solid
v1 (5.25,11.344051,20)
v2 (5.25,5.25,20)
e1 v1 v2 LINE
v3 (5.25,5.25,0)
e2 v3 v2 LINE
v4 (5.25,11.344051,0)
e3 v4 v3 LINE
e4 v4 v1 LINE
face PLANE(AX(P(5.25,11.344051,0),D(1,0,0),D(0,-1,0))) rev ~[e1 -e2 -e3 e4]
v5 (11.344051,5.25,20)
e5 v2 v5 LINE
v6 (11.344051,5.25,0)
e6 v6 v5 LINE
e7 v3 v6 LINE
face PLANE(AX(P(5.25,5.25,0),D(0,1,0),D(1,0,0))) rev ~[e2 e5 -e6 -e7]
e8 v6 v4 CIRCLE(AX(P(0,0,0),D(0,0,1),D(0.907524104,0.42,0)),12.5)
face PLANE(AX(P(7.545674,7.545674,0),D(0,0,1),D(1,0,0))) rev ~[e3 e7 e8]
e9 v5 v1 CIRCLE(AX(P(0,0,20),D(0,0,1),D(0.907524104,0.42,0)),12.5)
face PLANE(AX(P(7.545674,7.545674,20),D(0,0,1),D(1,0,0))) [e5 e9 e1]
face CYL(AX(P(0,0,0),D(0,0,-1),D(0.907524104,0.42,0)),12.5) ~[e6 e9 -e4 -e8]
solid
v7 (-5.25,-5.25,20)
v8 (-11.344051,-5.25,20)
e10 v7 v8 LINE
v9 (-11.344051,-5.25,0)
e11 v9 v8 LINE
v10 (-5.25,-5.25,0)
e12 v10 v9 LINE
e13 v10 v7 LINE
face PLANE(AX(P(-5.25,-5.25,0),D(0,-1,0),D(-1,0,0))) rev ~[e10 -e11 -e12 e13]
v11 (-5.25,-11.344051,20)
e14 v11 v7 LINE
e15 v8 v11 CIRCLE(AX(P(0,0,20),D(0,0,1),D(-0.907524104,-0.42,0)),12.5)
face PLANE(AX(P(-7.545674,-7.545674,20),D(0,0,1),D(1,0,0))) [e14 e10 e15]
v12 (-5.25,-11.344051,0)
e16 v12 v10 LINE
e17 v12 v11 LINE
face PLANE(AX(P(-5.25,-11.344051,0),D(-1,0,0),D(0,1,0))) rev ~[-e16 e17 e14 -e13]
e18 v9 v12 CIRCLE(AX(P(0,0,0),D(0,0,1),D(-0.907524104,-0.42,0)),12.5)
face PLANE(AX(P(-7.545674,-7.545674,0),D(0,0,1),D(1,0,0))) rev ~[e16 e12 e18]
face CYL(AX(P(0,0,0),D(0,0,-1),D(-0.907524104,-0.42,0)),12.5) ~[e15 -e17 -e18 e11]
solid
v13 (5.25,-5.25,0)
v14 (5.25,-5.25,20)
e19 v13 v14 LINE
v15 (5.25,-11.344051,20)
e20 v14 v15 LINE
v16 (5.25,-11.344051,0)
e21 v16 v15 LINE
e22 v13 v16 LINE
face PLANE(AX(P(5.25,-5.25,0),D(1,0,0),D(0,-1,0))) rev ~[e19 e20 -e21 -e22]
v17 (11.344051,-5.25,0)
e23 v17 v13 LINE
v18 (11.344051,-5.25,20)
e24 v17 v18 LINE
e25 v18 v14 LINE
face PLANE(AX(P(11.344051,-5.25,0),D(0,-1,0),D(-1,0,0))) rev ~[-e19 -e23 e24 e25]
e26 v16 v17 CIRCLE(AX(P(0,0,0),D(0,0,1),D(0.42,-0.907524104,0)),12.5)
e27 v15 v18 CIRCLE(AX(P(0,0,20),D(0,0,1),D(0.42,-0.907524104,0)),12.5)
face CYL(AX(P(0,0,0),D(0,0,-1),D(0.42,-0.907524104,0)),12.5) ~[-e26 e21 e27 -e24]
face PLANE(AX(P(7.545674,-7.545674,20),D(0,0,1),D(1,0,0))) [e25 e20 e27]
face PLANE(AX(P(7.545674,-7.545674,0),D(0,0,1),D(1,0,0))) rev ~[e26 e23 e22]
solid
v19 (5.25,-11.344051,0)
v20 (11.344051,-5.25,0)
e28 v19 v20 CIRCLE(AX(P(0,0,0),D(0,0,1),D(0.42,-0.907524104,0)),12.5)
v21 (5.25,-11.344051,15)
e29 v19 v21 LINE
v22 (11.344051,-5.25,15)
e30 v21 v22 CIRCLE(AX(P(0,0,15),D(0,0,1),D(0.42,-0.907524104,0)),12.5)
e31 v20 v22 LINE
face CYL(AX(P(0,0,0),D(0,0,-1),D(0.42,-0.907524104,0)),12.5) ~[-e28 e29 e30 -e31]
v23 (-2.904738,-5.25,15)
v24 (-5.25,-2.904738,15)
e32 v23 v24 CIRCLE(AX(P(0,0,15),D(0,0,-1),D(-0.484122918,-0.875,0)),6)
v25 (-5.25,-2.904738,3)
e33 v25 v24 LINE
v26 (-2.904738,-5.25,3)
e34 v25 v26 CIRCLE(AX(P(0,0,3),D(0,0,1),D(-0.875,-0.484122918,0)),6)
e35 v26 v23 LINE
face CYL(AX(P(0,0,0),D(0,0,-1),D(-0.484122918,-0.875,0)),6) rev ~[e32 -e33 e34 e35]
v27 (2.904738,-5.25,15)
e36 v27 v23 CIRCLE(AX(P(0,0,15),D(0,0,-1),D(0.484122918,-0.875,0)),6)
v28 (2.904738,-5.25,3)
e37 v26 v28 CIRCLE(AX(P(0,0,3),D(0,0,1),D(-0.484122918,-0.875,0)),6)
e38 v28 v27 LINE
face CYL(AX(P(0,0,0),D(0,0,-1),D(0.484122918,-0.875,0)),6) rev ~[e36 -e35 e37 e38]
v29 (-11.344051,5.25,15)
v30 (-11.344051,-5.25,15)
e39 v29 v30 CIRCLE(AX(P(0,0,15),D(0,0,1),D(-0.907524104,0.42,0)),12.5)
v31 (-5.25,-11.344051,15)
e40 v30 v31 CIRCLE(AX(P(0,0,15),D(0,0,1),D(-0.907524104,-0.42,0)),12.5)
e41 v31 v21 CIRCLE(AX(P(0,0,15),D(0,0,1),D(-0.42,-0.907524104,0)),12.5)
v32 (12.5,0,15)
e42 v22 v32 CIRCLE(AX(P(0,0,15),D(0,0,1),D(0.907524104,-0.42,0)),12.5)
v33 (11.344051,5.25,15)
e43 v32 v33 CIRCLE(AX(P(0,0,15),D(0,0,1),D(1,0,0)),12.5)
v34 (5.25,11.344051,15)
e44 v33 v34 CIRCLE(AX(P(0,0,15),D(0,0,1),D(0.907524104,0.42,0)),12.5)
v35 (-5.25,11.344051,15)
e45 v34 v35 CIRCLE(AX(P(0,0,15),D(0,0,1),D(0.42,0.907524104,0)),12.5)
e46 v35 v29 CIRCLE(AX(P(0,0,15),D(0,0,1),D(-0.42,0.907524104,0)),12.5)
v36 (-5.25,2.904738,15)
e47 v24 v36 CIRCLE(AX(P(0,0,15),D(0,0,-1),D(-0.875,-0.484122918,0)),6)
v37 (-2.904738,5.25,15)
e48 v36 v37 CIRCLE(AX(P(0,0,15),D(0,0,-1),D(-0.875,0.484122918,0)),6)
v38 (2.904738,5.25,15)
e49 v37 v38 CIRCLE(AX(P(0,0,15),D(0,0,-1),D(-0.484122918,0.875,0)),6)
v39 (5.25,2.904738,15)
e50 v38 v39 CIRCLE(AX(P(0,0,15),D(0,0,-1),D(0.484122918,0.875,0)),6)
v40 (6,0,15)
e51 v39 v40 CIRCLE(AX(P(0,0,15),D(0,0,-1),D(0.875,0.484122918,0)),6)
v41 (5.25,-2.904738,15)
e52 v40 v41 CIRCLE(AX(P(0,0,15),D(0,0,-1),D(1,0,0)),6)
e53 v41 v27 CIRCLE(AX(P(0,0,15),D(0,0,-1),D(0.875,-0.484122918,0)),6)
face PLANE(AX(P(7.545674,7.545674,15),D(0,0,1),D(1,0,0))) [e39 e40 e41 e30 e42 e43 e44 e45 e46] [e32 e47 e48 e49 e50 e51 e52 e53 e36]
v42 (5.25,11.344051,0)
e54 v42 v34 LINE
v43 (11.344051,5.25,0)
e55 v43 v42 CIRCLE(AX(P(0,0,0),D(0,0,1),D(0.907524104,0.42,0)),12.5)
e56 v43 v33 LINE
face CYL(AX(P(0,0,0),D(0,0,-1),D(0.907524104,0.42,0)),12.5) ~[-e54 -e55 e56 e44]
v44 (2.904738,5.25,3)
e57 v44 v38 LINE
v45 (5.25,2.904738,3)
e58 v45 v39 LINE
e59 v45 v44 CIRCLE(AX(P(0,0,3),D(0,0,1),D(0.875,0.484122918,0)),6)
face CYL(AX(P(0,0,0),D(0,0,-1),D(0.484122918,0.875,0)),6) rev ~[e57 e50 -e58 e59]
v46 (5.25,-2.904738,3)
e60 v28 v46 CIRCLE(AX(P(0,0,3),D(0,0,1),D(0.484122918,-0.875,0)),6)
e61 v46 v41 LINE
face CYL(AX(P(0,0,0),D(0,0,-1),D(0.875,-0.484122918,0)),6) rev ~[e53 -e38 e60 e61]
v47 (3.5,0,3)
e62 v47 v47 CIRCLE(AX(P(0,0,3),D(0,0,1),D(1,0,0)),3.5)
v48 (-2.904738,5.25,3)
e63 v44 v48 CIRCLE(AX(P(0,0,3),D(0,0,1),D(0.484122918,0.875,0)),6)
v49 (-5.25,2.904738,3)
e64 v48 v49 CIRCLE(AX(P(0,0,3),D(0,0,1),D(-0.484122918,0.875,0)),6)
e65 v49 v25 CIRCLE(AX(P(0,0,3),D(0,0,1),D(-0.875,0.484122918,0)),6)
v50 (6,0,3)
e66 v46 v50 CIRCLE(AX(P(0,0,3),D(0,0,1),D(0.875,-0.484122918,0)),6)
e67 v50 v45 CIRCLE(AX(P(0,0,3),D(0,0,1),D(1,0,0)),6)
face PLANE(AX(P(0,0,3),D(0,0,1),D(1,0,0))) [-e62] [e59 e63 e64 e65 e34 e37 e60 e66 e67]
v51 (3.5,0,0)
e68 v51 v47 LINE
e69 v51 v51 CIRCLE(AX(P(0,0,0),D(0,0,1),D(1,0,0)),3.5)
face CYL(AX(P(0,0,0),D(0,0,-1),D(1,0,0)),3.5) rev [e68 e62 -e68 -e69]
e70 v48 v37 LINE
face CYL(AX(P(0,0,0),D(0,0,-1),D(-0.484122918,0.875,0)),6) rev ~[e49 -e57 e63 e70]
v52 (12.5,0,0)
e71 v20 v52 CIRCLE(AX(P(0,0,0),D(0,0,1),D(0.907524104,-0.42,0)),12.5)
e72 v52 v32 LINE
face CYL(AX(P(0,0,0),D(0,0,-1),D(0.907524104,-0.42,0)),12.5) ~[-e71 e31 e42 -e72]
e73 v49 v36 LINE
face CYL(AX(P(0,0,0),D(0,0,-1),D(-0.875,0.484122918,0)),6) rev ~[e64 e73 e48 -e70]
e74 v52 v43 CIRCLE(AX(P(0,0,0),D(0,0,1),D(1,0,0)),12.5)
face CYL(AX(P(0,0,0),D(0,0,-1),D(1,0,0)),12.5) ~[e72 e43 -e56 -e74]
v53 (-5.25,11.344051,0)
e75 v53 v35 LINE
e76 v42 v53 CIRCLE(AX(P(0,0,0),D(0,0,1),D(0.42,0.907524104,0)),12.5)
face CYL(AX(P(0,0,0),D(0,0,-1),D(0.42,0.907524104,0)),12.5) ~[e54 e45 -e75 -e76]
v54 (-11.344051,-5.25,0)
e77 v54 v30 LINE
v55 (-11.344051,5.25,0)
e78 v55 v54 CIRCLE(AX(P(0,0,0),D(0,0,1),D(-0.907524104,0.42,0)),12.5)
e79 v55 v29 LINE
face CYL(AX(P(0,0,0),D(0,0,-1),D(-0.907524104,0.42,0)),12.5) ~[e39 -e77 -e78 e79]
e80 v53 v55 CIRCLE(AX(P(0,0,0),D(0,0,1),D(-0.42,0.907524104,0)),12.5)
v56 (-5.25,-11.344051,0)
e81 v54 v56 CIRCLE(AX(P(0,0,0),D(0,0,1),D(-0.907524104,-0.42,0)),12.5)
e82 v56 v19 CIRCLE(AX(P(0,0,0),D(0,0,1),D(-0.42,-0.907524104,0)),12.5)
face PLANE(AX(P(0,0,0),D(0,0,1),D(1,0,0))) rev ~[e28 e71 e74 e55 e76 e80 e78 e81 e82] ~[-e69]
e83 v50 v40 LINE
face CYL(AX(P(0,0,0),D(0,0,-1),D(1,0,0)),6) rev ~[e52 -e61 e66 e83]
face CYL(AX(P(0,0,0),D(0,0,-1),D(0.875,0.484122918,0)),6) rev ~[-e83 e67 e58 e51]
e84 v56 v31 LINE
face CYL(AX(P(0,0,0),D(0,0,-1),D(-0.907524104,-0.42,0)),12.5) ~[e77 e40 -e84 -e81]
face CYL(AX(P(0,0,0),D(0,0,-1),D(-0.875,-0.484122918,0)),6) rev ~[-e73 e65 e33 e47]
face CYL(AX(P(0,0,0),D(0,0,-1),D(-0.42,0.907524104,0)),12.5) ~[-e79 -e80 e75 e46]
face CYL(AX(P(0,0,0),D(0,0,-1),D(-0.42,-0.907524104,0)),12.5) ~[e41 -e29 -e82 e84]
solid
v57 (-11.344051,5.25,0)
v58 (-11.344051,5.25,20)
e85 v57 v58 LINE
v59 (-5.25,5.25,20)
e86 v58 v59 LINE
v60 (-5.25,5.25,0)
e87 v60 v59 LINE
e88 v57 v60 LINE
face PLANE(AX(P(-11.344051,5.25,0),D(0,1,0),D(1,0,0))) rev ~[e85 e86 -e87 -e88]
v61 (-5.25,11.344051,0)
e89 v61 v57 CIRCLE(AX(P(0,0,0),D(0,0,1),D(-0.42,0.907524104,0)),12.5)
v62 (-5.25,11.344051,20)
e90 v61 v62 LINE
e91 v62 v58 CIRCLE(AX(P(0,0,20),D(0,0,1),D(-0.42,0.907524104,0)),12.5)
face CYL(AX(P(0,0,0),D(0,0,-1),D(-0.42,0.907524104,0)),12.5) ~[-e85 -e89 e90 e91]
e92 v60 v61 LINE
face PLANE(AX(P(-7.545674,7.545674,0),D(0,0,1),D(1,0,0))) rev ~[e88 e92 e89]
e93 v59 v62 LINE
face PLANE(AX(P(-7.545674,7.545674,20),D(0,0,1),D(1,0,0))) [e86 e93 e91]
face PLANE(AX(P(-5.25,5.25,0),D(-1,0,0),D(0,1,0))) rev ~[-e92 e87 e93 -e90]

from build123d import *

# Parameters (mm, degrees)
F1_DEPTH = 15
F2_DEPTH = 20
F0_R     = 3.5
F3_DEPTH = 3


with BuildPart() as f1:
    # F0 (on Top) → F1 (new body)
    with BuildSketch(Plane.XY):
        with BuildLine():
            Line((5.25, 5.25), (11.3440513045, 5.25))
            ThreePointArc((11.3440513045, 5.25), (8.8388347648, 8.8388347648), (5.25, 11.3440513045))
            Line((5.25, 11.3440513045), (5.25, 5.25))
        make_face()
        with BuildLine():
            Line((5.25, 5.25), (5.25, 11.3440513045))
            ThreePointArc((5.25, 11.3440513045), (0, 12.5), (-5.25, 11.3440513045))
            Line((-5.25, 11.3440513045), (-5.25, 5.25))
            Line((-5.25, 5.25), (-2.9047375097, 5.25))
            ThreePointArc((-2.9047375097, 5.25), (0, 6), (2.9047375097, 5.25))
            Line((2.9047375097, 5.25), (5.25, 5.25))
        make_face()
        with BuildLine():
            Line((-5.25, 5.25), (-5.25, 11.3440513045))
            ThreePointArc((-5.25, 11.3440513045), (-8.8388347648, 8.8388347648), (-11.3440513045, 5.25))
            Line((-11.3440513045, 5.25), (-5.25, 5.25))
        make_face()
        with BuildLine():
            Line((-5.25, 5.25), (-11.3440513045, 5.25))
            ThreePointArc((-11.3440513045, 5.25), (-12.5, 0), (-11.3440513045, -5.25))
            Line((-11.3440513045, -5.25), (-5.25, -5.25))
            Line((-5.25, -5.25), (-5.25, -2.9047375097))
            ThreePointArc((-5.25, -2.9047375097), (-6, 0), (-5.25, 2.9047375097))
            Line((-5.25, 2.9047375097), (-5.25, 5.25))
        make_face()
        with BuildLine():
            ThreePointArc((-11.3440513045, -5.25), (-8.8388347648, -8.8388347648), (-5.25, -11.3440513045))
            Line((-5.25, -11.3440513045), (-5.25, -5.25))
            Line((-5.25, -5.25), (-11.3440513045, -5.25))
        make_face()
        with BuildLine():
            ThreePointArc((-5.25, -11.3440513045), (0, -12.5), (5.25, -11.3440513045))
            Line((5.25, -11.3440513045), (5.25, -5.25))
            Line((5.25, -5.25), (2.9047375097, -5.25))
            ThreePointArc((2.9047375097, -5.25), (0, -6), (-2.9047375097, -5.25))
            Line((-2.9047375097, -5.25), (-5.25, -5.25))
            Line((-5.25, -5.25), (-5.25, -11.3440513045))
        make_face()
        with BuildLine():
            ThreePointArc((5.25, -11.3440513045), (8.8388347648, -8.8388347648), (11.3440513045, -5.25))
            Line((11.3440513045, -5.25), (5.25, -5.25))
            Line((5.25, -5.25), (5.25, -11.3440513045))
        make_face()
        with BuildLine():
            ThreePointArc((11.3440513045, -5.25), (12.207592746, -2.6878763637), (12.5, 0))
            ThreePointArc((12.5, 0), (12.207592746, 2.6878763637), (11.3440513045, 5.25))
            Line((11.3440513045, 5.25), (5.25, 5.25))
            Line((5.25, 5.25), (5.25, 2.9047375097))
            ThreePointArc((5.25, 2.9047375097), (5.8094750193, 1.5), (6, 0))
            ThreePointArc((6, 0), (5.8094750193, -1.5), (5.25, -2.9047375097))
            Line((5.25, -2.9047375097), (5.25, -5.25))
            Line((5.25, -5.25), (11.3440513045, -5.25))
        make_face()
        with BuildLine():
            Line((5.25, 2.9047375097), (5.25, 5.25))
            Line((5.25, 5.25), (2.9047375097, 5.25))
            ThreePointArc((2.9047375097, 5.25), (4.2426406871, 4.2426406871), (5.25, 2.9047375097))
        make_face()
        with BuildLine():
            Line((-2.9047375097, 5.25), (-5.25, 5.25))
            Line((-5.25, 5.25), (-5.25, 2.9047375097))
            ThreePointArc((-5.25, 2.9047375097), (-4.2426406871, 4.2426406871), (-2.9047375097, 5.25))
        make_face()
        with BuildLine():
            Line((-5.25, -2.9047375097), (-5.25, -5.25))
            Line((-5.25, -5.25), (-2.9047375097, -5.25))
            ThreePointArc((-2.9047375097, -5.25), (-4.2426406871, -4.2426406871), (-5.25, -2.9047375097))
        make_face()
        with BuildLine():
            Line((2.9047375097, -5.25), (5.25, -5.25))
            Line((5.25, -5.25), (5.25, -2.9047375097))
            ThreePointArc((5.25, -2.9047375097), (4.2426406871, -4.2426406871), (2.9047375097, -5.25))
        make_face()
    extrude(amount=F1_DEPTH)

    # F0 (on Top) → F3 (join)
    with BuildSketch(Plane.XY):
        with BuildLine():
            Line((5.25, -2.9047375097), (5.25, 2.9047375097))
            ThreePointArc((5.25, 2.9047375097), (4.2426406871, 4.2426406871), (2.9047375097, 5.25))
            Line((2.9047375097, 5.25), (-2.9047375097, 5.25))
            ThreePointArc((-2.9047375097, 5.25), (-4.2426406871, 4.2426406871), (-5.25, 2.9047375097))
            Line((-5.25, 2.9047375097), (-5.25, -2.9047375097))
            ThreePointArc((-5.25, -2.9047375097), (-4.2426406871, -4.2426406871), (-2.9047375097, -5.25))
            Line((-2.9047375097, -5.25), (2.9047375097, -5.25))
            ThreePointArc((2.9047375097, -5.25), (4.2426406871, -4.2426406871), (5.25, -2.9047375097))
        make_face()
        Circle(F0_R, mode=Mode.SUBTRACT)
        with BuildLine():
            Line((-2.9047375097, 5.25), (2.9047375097, 5.25))
            ThreePointArc((2.9047375097, 5.25), (0, 6), (-2.9047375097, 5.25))
        make_face()
        with BuildLine():
            Line((-5.25, -2.9047375097), (-5.25, 2.9047375097))
            ThreePointArc((-5.25, 2.9047375097), (-6, 0), (-5.25, -2.9047375097))
        make_face()
        with BuildLine():
            ThreePointArc((-2.9047375097, -5.25), (0, -6), (2.9047375097, -5.25))
            Line((2.9047375097, -5.25), (-2.9047375097, -5.25))
        make_face()
        with BuildLine():
            ThreePointArc((6, 0), (5.8094750193, 1.5), (5.25, 2.9047375097))
            Line((5.25, 2.9047375097), (5.25, -2.9047375097))
            ThreePointArc((5.25, -2.9047375097), (5.8094750193, -1.5), (6, 0))
        make_face()
    extrude(amount=F3_DEPTH)


with BuildPart() as f2:
    # F0 (on Top) → F2 (new body)
    with BuildSketch(Plane.XY):
        with BuildLine():
            Line((5.25, 5.25), (11.3440513045, 5.25))
            ThreePointArc((11.3440513045, 5.25), (8.8388347648, 8.8388347648), (5.25, 11.3440513045))
            Line((5.25, 11.3440513045), (5.25, 5.25))
        make_face()
    extrude(amount=F2_DEPTH)


with BuildPart() as f2b:
    # F0 (on Top) → F2, piece 2 (new body)
    with BuildSketch(Plane.XY):
        with BuildLine():
            ThreePointArc((5.25, -11.3440513045), (8.8388347648, -8.8388347648), (11.3440513045, -5.25))
            Line((11.3440513045, -5.25), (5.25, -5.25))
            Line((5.25, -5.25), (5.25, -11.3440513045))
        make_face()
    extrude(amount=F2_DEPTH)


with BuildPart() as f2c:
    # F0 (on Top) → F2, piece 3 (new body)
    with BuildSketch(Plane.XY):
        with BuildLine():
            Line((-5.25, 5.25), (-5.25, 11.3440513045))
            ThreePointArc((-5.25, 11.3440513045), (-8.8388347648, 8.8388347648), (-11.3440513045, 5.25))
            Line((-11.3440513045, 5.25), (-5.25, 5.25))
        make_face()
    extrude(amount=F2_DEPTH)


with BuildPart() as f2d:
    # F0 (on Top) → F2, piece 4 (new body)
    with BuildSketch(Plane.XY):
        with BuildLine():
            ThreePointArc((-11.3440513045, -5.25), (-8.8388347648, -8.8388347648), (-5.25, -11.3440513045))
            Line((-5.25, -11.3440513045), (-5.25, -5.25))
            Line((-5.25, -5.25), (-11.3440513045, -5.25))
        make_face()
    extrude(amount=F2_DEPTH)


solid = Compound([f1.part, f2.part, f2b.part, f2c.part, f2d.part])
